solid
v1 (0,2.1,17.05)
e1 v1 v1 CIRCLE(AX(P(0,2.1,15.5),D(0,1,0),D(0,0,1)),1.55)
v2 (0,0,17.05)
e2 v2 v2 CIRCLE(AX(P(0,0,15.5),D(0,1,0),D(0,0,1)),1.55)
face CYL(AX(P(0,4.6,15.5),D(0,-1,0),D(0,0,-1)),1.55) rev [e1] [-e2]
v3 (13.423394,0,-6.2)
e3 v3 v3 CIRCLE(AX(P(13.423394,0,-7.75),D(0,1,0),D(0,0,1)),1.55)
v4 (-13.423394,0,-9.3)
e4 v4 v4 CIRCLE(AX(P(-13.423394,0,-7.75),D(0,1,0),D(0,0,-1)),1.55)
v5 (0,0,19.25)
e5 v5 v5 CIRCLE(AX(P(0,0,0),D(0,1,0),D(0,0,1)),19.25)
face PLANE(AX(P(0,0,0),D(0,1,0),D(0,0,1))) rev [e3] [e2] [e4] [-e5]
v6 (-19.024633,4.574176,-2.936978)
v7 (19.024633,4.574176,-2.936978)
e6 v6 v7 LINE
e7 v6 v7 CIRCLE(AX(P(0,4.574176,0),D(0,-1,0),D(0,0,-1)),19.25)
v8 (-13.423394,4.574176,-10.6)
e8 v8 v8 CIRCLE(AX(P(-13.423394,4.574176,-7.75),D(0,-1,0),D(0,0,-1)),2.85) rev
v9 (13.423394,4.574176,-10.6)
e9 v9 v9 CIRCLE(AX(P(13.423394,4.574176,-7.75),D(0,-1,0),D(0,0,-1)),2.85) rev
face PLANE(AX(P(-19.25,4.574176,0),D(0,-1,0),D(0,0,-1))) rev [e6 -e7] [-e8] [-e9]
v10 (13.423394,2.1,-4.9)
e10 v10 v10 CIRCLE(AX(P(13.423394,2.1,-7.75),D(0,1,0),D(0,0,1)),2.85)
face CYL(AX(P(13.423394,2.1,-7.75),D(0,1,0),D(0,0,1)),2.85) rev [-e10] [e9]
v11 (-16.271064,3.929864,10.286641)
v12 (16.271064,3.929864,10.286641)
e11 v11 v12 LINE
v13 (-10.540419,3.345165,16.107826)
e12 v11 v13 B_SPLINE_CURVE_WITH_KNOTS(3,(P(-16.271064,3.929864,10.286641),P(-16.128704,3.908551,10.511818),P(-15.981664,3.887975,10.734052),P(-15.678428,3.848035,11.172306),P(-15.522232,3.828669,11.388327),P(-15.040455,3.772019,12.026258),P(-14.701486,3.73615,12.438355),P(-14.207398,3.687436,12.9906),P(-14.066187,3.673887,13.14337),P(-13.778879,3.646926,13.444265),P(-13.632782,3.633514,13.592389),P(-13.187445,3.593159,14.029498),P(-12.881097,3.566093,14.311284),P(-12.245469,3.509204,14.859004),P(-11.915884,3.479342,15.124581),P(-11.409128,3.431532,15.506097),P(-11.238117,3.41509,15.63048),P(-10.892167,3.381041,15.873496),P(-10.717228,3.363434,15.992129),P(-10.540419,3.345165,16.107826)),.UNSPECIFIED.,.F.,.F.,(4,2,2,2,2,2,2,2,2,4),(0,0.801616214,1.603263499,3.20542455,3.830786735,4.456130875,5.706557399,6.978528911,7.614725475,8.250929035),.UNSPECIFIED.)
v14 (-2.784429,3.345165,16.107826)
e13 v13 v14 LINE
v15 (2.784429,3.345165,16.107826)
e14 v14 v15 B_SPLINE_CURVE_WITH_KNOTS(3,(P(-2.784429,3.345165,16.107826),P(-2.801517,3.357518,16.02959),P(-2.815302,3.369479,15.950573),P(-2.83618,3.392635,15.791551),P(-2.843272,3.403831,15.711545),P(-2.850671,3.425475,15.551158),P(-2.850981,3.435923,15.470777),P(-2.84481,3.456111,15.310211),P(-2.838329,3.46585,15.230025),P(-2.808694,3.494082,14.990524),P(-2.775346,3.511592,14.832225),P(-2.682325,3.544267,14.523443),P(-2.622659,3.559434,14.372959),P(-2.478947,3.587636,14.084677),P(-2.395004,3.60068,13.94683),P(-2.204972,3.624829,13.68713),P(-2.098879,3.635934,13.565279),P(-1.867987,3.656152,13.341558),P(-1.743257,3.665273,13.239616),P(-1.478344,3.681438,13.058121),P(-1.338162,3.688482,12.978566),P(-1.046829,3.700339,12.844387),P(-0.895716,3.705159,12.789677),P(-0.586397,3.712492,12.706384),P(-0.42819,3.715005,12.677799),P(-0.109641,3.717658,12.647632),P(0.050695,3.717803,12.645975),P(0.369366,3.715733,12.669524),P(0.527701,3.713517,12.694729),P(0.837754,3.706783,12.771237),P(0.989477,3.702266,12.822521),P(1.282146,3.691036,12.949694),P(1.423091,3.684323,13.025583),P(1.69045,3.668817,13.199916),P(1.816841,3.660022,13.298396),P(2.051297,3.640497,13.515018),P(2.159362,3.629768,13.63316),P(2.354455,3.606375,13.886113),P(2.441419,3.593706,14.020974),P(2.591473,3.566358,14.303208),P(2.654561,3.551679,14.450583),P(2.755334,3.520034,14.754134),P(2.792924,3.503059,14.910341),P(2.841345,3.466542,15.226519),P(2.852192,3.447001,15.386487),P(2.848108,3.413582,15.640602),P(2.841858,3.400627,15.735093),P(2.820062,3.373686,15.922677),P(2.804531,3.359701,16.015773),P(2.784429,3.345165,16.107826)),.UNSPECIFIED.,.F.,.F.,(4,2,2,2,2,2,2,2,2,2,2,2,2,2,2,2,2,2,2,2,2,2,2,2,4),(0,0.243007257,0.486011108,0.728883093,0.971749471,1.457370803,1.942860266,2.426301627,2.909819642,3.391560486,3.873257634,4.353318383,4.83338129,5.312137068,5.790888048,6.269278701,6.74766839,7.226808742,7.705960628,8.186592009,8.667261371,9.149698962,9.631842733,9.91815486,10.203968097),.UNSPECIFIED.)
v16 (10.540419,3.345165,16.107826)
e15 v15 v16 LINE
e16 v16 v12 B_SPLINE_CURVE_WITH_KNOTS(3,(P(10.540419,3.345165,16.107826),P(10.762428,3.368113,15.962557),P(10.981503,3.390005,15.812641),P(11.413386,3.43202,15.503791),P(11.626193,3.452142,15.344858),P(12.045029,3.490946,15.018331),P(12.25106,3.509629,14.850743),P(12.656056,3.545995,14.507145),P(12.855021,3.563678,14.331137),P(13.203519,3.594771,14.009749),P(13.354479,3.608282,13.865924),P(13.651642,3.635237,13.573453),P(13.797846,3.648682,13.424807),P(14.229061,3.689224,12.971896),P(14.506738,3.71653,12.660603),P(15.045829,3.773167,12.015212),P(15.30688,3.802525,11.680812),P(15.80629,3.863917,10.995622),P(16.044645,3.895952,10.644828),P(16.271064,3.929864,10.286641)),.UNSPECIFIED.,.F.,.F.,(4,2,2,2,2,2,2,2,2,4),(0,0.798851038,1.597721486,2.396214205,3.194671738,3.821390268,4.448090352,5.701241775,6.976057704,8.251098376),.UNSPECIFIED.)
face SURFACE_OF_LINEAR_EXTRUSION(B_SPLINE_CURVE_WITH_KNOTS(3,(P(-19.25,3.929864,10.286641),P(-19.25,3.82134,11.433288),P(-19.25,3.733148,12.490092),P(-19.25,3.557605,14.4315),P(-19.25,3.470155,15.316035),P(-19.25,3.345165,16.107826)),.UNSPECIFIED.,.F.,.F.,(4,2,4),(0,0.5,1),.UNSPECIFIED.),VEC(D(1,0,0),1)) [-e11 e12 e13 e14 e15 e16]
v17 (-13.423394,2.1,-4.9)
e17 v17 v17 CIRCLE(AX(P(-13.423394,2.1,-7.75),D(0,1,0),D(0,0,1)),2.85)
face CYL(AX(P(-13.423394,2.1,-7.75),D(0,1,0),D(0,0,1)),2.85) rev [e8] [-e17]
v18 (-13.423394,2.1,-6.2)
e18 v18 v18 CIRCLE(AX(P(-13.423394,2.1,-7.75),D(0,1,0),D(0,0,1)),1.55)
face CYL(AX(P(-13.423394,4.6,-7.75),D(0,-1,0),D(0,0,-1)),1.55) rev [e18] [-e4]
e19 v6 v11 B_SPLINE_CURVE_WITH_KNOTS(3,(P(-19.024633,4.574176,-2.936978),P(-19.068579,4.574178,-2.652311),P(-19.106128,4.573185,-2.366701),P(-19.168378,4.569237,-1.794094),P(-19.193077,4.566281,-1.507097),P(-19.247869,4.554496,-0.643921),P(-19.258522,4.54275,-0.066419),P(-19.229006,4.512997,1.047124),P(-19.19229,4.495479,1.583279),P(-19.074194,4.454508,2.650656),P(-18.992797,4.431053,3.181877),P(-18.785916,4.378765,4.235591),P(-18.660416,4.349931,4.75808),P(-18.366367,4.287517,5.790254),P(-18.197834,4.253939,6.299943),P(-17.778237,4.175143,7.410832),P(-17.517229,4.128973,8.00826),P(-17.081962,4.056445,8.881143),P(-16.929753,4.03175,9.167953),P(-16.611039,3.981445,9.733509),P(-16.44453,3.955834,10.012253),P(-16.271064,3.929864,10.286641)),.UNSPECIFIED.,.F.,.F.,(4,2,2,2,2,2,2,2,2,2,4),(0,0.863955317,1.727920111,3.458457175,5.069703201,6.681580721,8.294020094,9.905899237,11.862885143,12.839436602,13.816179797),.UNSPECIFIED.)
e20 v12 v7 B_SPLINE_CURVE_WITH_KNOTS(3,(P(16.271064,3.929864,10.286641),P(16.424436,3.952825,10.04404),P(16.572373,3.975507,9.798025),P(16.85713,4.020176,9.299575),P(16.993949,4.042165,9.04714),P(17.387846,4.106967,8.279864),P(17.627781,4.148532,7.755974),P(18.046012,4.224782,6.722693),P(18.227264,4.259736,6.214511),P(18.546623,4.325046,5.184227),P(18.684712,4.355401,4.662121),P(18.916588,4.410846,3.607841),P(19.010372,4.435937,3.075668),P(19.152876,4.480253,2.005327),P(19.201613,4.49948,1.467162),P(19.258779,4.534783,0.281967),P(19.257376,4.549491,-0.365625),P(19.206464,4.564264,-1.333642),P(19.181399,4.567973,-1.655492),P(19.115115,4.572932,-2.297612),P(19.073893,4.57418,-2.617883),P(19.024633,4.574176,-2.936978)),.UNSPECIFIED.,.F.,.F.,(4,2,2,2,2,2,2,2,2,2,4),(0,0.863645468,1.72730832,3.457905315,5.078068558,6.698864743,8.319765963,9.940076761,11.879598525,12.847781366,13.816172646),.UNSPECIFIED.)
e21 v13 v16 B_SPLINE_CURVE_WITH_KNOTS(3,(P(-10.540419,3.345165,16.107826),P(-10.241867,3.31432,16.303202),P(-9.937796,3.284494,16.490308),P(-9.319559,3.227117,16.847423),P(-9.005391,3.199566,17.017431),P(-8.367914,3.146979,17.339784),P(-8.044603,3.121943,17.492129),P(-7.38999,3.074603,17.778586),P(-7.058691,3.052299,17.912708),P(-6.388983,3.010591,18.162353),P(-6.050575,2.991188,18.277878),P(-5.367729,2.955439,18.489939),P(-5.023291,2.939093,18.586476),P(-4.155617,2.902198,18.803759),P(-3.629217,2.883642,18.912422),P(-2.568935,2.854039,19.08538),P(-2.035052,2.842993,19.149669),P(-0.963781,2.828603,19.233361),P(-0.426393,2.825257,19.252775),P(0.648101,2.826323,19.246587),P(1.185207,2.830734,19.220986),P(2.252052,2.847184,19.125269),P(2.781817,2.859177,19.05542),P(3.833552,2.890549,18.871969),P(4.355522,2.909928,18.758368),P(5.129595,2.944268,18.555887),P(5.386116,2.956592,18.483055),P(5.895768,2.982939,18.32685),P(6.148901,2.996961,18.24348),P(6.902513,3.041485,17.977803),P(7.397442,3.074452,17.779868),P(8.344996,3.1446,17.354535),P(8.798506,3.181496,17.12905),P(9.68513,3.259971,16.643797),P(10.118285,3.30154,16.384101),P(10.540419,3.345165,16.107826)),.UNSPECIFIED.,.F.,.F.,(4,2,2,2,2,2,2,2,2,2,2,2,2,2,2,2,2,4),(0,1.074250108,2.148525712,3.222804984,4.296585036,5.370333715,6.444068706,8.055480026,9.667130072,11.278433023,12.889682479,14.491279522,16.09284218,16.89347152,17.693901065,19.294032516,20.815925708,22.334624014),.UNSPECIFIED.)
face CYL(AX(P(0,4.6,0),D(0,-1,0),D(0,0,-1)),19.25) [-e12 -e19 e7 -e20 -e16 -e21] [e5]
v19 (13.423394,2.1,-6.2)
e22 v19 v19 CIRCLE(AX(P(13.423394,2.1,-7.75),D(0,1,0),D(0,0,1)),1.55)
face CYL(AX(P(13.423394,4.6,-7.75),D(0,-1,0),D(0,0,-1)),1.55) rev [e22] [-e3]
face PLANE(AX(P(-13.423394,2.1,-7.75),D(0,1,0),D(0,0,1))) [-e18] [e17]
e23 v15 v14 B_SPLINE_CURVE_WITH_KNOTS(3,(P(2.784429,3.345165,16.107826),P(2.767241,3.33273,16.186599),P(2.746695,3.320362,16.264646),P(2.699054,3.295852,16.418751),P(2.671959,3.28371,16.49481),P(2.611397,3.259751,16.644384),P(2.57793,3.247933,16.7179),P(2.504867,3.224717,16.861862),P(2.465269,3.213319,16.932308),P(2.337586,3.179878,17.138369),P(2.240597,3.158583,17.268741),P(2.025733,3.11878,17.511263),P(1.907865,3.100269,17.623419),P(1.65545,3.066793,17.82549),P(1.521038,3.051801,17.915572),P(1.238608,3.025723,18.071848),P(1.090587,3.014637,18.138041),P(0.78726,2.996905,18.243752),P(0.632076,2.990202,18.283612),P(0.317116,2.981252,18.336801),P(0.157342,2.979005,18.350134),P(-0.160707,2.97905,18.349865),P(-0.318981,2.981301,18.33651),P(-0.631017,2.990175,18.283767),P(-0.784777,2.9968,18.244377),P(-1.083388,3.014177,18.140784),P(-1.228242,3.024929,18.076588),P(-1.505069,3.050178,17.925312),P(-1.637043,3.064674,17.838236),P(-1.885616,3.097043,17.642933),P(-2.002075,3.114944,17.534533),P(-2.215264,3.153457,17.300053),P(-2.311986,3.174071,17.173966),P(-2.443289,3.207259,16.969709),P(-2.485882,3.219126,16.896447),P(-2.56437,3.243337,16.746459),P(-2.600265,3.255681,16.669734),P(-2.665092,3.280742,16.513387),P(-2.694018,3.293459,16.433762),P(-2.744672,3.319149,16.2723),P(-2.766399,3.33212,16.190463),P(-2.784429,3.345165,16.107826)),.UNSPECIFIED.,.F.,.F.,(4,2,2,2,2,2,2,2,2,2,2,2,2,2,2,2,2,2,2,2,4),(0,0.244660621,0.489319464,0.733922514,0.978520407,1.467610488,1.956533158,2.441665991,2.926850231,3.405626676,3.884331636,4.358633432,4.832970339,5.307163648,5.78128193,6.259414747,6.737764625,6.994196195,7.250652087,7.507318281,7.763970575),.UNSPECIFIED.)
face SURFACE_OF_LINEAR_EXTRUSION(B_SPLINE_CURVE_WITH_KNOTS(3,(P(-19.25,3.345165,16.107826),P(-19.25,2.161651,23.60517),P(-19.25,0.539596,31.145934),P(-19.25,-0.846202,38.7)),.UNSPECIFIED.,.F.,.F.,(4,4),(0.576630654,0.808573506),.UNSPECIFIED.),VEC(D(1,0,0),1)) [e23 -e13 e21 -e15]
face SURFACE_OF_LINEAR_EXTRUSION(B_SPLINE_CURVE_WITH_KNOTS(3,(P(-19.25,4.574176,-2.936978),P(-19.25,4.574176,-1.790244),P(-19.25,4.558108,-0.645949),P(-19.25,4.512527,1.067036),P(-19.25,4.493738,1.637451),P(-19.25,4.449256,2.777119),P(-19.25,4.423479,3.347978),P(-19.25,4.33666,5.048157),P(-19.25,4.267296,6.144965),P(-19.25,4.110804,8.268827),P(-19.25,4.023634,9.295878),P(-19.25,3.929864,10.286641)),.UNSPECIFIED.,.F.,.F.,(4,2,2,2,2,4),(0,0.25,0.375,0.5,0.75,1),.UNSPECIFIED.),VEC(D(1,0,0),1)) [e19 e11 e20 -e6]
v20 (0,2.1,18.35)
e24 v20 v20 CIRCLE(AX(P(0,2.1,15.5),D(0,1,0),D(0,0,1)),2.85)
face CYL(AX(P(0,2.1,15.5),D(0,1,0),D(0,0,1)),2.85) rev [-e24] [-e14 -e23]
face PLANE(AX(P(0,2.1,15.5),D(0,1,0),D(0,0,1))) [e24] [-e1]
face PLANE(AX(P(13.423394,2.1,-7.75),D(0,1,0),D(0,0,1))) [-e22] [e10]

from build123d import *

# Parameters (mm, degrees)
CROQUIS1_R              = 19.25
CROQUIS1_R_2            = 1.55
SALIENTE_EXTRUIR1_DEPTH = 4.6
CROQUIS2_R              = 2.85
CORTAR_EXTRUIR1_DEPTH   = 2.5
CORTAR_EXTRUIR2_START   = -20
CORTAR_EXTRUIR2_DEPTH   = 39.25


with BuildPart() as part:
    # Croquis1 → Saliente-Extruir1 (new body)
    with BuildSketch(Plane(origin=(0, 0, 0), x_dir=(1, 0, 0), z_dir=(0, 1, 0))):
        with Locations(Location((0, 0, 0), (0, 0, 270))):
            Circle(CROQUIS1_R)
        with Locations(Location((0, -15.5, 0), (0, 0, 270))):
            Circle(CROQUIS1_R_2, mode=Mode.SUBTRACT)
        with Locations(Location((13.423393759, 7.75, 0), (0, 0, 270))):
            Circle(CROQUIS1_R_2, mode=Mode.SUBTRACT)
        with Locations(Location((-13.423393759, 7.75, 0), (0, 0, 90))):
            Circle(CROQUIS1_R_2, mode=Mode.SUBTRACT)
    extrude(amount=SALIENTE_EXTRUIR1_DEPTH)

    # Croquis2 → Cortar-Extruir1 (cut)
    with BuildSketch(Plane(origin=(0, 4.6, 0), x_dir=(1, 0, 0), z_dir=(0, 1, 0))):
        with Locations(Location((-13.423393759, 7.75, 0), (0, 0, 270))):
            Circle(CROQUIS2_R)
        with Locations(Location((0, -15.5, 0), (0, 0, 270))):
            Circle(CROQUIS2_R)
        with Locations(Location((13.423393759, 7.75, 0), (0, 0, 270))):
            Circle(CROQUIS2_R)
    extrude(amount=-CORTAR_EXTRUIR1_DEPTH, mode=Mode.SUBTRACT)

    # Cortar-Extruir2: read off the stored shape, not the designer's step
    # Cortar-Extruir2 outline → Cortar-Extruir2 (cut)
    with BuildSketch(Plane(origin=(0, 0, 0), x_dir=(0, 0, -1), z_dir=(1, 0, 0)).offset(CORTAR_EXTRUIR2_START)):
        with BuildLine():
            add(Edge.make_bspline(
                [(2.936977636, 4.574175621), (1.790244303, 4.574175621), (0.64594889, 4.558108358), (-1.067035866, 4.512526979), (-1.637451159, 4.493737954), (-2.777118659, 4.449256149), (-3.347978215, 4.423479493), (-5.04815673, 4.33666012), (-6.144965171, 4.267295894), (-8.268827136, 4.110803555), (-9.295878077, 4.023634192), (-10.286640587, 3.929863966)],
                knots=[0, 0, 0, 0, 0.25, 0.25, 0.375, 0.375, 0.5, 0.5, 0.75, 0.75, 1, 1, 1, 1], degree=3))
            Line((2.936977636, 4.574175621), (19.25, 4.574175621))
            Line((19.25, 4.574175621), (20, 4.574175621))
            Line((20, 4.574175621), (20, 28.682505432))
            Line((20, 28.682505432), (9.143406809, 28.682505432))
            add(Edge.make_bspline(
                [(9.143406809, 28.682505432), (0.711546133, 17.325043273), (-7.611623296, 9.681788834), (-15.859834912, 4.6)],
                knots=[-1.666266403, -1.666266403, -1.666266403, -1.666266403, -0.863138153, -0.863138153, -0.863138153, -0.863138153], degree=3))
            add(Edge.make_bspline(
                [(-15.859834912, 4.6), (-16.832562085, 4.000695046), (-17.80424675, 3.437014777), (-18.774944235, 2.907068479)],
                knots=[-0.863138153, -0.863138153, -0.863138153, -0.863138153, -0.768423721, -0.768423721, -0.768423721, -0.768423721], degree=3))
            add(Edge.make_bspline(
                [(-16.107826284, 3.345164552), (-16.996272574, 3.2049165), (-17.885328598, 3.058510171), (-18.774944235, 2.907068479)],
                knots=[0.576630654, 0.576630654, 0.576630654, 0.576630654, 0.604116223, 0.604116223, 0.604116223, 0.604116223], degree=3))
            add(Edge.make_bspline(
                [(-10.286640587, 3.929863966), (-11.433287768, 3.821340113), (-12.490092354, 3.733147685), (-14.431499601, 3.557604756), (-15.316034761, 3.47015491), (-16.107826284, 3.345164552)],
                knots=[0, 0, 0, 0, 0.5, 0.5, 1, 1, 1, 1], degree=3))
        make_face()
        with BuildLine():
            add(Edge.make_bspline(
                [(-18.774944235, 2.907068479), (-18.933464547, 2.880083135), (-19.092002628, 2.85293791), (-19.250558194, 2.825639157)],
                knots=[0.604116223, 0.604116223, 0.604116223, 0.604116223, 0.609013868, 0.609013868, 0.609013868, 0.609013868], degree=3))
            add(Edge.make_bspline(
                [(-15.859834912, 4.6), (-16.832562085, 4.000695046), (-17.80424675, 3.437014777), (-18.774944235, 2.907068479)],
                knots=[-0.863138153, -0.863138153, -0.863138153, -0.863138153, -0.768423721, -0.768423721, -0.768423721, -0.768423721], degree=3))
            add(Edge.make_bspline(
                [(9.143406809, 28.682505432), (0.711546133, 17.325043273), (-7.611623296, 9.681788834), (-15.859834912, 4.6)],
                knots=[-1.666266403, -1.666266403, -1.666266403, -1.666266403, -0.863138153, -0.863138153, -0.863138153, -0.863138153], degree=3))
            Line((9.143406809, 28.682505432), (-19.854758161, 28.682505432))
            Line((-19.854758161, 28.682505432), (-19.854758161, 2.720897695))
            add(Edge.make_bspline(
                [(-19.250558194, 2.825639157), (-19.451930173, 2.790968638), (-19.653330356, 2.756050479), (-19.854758161, 2.720897695)],
                knots=[0.609013868, 0.609013868, 0.609013868, 0.609013868, 0.615234074, 0.615234074, 0.615234074, 0.615234074], degree=3))
        make_face()
    extrude(amount=CORTAR_EXTRUIR2_DEPTH, mode=Mode.SUBTRACT)


solid = part.part
